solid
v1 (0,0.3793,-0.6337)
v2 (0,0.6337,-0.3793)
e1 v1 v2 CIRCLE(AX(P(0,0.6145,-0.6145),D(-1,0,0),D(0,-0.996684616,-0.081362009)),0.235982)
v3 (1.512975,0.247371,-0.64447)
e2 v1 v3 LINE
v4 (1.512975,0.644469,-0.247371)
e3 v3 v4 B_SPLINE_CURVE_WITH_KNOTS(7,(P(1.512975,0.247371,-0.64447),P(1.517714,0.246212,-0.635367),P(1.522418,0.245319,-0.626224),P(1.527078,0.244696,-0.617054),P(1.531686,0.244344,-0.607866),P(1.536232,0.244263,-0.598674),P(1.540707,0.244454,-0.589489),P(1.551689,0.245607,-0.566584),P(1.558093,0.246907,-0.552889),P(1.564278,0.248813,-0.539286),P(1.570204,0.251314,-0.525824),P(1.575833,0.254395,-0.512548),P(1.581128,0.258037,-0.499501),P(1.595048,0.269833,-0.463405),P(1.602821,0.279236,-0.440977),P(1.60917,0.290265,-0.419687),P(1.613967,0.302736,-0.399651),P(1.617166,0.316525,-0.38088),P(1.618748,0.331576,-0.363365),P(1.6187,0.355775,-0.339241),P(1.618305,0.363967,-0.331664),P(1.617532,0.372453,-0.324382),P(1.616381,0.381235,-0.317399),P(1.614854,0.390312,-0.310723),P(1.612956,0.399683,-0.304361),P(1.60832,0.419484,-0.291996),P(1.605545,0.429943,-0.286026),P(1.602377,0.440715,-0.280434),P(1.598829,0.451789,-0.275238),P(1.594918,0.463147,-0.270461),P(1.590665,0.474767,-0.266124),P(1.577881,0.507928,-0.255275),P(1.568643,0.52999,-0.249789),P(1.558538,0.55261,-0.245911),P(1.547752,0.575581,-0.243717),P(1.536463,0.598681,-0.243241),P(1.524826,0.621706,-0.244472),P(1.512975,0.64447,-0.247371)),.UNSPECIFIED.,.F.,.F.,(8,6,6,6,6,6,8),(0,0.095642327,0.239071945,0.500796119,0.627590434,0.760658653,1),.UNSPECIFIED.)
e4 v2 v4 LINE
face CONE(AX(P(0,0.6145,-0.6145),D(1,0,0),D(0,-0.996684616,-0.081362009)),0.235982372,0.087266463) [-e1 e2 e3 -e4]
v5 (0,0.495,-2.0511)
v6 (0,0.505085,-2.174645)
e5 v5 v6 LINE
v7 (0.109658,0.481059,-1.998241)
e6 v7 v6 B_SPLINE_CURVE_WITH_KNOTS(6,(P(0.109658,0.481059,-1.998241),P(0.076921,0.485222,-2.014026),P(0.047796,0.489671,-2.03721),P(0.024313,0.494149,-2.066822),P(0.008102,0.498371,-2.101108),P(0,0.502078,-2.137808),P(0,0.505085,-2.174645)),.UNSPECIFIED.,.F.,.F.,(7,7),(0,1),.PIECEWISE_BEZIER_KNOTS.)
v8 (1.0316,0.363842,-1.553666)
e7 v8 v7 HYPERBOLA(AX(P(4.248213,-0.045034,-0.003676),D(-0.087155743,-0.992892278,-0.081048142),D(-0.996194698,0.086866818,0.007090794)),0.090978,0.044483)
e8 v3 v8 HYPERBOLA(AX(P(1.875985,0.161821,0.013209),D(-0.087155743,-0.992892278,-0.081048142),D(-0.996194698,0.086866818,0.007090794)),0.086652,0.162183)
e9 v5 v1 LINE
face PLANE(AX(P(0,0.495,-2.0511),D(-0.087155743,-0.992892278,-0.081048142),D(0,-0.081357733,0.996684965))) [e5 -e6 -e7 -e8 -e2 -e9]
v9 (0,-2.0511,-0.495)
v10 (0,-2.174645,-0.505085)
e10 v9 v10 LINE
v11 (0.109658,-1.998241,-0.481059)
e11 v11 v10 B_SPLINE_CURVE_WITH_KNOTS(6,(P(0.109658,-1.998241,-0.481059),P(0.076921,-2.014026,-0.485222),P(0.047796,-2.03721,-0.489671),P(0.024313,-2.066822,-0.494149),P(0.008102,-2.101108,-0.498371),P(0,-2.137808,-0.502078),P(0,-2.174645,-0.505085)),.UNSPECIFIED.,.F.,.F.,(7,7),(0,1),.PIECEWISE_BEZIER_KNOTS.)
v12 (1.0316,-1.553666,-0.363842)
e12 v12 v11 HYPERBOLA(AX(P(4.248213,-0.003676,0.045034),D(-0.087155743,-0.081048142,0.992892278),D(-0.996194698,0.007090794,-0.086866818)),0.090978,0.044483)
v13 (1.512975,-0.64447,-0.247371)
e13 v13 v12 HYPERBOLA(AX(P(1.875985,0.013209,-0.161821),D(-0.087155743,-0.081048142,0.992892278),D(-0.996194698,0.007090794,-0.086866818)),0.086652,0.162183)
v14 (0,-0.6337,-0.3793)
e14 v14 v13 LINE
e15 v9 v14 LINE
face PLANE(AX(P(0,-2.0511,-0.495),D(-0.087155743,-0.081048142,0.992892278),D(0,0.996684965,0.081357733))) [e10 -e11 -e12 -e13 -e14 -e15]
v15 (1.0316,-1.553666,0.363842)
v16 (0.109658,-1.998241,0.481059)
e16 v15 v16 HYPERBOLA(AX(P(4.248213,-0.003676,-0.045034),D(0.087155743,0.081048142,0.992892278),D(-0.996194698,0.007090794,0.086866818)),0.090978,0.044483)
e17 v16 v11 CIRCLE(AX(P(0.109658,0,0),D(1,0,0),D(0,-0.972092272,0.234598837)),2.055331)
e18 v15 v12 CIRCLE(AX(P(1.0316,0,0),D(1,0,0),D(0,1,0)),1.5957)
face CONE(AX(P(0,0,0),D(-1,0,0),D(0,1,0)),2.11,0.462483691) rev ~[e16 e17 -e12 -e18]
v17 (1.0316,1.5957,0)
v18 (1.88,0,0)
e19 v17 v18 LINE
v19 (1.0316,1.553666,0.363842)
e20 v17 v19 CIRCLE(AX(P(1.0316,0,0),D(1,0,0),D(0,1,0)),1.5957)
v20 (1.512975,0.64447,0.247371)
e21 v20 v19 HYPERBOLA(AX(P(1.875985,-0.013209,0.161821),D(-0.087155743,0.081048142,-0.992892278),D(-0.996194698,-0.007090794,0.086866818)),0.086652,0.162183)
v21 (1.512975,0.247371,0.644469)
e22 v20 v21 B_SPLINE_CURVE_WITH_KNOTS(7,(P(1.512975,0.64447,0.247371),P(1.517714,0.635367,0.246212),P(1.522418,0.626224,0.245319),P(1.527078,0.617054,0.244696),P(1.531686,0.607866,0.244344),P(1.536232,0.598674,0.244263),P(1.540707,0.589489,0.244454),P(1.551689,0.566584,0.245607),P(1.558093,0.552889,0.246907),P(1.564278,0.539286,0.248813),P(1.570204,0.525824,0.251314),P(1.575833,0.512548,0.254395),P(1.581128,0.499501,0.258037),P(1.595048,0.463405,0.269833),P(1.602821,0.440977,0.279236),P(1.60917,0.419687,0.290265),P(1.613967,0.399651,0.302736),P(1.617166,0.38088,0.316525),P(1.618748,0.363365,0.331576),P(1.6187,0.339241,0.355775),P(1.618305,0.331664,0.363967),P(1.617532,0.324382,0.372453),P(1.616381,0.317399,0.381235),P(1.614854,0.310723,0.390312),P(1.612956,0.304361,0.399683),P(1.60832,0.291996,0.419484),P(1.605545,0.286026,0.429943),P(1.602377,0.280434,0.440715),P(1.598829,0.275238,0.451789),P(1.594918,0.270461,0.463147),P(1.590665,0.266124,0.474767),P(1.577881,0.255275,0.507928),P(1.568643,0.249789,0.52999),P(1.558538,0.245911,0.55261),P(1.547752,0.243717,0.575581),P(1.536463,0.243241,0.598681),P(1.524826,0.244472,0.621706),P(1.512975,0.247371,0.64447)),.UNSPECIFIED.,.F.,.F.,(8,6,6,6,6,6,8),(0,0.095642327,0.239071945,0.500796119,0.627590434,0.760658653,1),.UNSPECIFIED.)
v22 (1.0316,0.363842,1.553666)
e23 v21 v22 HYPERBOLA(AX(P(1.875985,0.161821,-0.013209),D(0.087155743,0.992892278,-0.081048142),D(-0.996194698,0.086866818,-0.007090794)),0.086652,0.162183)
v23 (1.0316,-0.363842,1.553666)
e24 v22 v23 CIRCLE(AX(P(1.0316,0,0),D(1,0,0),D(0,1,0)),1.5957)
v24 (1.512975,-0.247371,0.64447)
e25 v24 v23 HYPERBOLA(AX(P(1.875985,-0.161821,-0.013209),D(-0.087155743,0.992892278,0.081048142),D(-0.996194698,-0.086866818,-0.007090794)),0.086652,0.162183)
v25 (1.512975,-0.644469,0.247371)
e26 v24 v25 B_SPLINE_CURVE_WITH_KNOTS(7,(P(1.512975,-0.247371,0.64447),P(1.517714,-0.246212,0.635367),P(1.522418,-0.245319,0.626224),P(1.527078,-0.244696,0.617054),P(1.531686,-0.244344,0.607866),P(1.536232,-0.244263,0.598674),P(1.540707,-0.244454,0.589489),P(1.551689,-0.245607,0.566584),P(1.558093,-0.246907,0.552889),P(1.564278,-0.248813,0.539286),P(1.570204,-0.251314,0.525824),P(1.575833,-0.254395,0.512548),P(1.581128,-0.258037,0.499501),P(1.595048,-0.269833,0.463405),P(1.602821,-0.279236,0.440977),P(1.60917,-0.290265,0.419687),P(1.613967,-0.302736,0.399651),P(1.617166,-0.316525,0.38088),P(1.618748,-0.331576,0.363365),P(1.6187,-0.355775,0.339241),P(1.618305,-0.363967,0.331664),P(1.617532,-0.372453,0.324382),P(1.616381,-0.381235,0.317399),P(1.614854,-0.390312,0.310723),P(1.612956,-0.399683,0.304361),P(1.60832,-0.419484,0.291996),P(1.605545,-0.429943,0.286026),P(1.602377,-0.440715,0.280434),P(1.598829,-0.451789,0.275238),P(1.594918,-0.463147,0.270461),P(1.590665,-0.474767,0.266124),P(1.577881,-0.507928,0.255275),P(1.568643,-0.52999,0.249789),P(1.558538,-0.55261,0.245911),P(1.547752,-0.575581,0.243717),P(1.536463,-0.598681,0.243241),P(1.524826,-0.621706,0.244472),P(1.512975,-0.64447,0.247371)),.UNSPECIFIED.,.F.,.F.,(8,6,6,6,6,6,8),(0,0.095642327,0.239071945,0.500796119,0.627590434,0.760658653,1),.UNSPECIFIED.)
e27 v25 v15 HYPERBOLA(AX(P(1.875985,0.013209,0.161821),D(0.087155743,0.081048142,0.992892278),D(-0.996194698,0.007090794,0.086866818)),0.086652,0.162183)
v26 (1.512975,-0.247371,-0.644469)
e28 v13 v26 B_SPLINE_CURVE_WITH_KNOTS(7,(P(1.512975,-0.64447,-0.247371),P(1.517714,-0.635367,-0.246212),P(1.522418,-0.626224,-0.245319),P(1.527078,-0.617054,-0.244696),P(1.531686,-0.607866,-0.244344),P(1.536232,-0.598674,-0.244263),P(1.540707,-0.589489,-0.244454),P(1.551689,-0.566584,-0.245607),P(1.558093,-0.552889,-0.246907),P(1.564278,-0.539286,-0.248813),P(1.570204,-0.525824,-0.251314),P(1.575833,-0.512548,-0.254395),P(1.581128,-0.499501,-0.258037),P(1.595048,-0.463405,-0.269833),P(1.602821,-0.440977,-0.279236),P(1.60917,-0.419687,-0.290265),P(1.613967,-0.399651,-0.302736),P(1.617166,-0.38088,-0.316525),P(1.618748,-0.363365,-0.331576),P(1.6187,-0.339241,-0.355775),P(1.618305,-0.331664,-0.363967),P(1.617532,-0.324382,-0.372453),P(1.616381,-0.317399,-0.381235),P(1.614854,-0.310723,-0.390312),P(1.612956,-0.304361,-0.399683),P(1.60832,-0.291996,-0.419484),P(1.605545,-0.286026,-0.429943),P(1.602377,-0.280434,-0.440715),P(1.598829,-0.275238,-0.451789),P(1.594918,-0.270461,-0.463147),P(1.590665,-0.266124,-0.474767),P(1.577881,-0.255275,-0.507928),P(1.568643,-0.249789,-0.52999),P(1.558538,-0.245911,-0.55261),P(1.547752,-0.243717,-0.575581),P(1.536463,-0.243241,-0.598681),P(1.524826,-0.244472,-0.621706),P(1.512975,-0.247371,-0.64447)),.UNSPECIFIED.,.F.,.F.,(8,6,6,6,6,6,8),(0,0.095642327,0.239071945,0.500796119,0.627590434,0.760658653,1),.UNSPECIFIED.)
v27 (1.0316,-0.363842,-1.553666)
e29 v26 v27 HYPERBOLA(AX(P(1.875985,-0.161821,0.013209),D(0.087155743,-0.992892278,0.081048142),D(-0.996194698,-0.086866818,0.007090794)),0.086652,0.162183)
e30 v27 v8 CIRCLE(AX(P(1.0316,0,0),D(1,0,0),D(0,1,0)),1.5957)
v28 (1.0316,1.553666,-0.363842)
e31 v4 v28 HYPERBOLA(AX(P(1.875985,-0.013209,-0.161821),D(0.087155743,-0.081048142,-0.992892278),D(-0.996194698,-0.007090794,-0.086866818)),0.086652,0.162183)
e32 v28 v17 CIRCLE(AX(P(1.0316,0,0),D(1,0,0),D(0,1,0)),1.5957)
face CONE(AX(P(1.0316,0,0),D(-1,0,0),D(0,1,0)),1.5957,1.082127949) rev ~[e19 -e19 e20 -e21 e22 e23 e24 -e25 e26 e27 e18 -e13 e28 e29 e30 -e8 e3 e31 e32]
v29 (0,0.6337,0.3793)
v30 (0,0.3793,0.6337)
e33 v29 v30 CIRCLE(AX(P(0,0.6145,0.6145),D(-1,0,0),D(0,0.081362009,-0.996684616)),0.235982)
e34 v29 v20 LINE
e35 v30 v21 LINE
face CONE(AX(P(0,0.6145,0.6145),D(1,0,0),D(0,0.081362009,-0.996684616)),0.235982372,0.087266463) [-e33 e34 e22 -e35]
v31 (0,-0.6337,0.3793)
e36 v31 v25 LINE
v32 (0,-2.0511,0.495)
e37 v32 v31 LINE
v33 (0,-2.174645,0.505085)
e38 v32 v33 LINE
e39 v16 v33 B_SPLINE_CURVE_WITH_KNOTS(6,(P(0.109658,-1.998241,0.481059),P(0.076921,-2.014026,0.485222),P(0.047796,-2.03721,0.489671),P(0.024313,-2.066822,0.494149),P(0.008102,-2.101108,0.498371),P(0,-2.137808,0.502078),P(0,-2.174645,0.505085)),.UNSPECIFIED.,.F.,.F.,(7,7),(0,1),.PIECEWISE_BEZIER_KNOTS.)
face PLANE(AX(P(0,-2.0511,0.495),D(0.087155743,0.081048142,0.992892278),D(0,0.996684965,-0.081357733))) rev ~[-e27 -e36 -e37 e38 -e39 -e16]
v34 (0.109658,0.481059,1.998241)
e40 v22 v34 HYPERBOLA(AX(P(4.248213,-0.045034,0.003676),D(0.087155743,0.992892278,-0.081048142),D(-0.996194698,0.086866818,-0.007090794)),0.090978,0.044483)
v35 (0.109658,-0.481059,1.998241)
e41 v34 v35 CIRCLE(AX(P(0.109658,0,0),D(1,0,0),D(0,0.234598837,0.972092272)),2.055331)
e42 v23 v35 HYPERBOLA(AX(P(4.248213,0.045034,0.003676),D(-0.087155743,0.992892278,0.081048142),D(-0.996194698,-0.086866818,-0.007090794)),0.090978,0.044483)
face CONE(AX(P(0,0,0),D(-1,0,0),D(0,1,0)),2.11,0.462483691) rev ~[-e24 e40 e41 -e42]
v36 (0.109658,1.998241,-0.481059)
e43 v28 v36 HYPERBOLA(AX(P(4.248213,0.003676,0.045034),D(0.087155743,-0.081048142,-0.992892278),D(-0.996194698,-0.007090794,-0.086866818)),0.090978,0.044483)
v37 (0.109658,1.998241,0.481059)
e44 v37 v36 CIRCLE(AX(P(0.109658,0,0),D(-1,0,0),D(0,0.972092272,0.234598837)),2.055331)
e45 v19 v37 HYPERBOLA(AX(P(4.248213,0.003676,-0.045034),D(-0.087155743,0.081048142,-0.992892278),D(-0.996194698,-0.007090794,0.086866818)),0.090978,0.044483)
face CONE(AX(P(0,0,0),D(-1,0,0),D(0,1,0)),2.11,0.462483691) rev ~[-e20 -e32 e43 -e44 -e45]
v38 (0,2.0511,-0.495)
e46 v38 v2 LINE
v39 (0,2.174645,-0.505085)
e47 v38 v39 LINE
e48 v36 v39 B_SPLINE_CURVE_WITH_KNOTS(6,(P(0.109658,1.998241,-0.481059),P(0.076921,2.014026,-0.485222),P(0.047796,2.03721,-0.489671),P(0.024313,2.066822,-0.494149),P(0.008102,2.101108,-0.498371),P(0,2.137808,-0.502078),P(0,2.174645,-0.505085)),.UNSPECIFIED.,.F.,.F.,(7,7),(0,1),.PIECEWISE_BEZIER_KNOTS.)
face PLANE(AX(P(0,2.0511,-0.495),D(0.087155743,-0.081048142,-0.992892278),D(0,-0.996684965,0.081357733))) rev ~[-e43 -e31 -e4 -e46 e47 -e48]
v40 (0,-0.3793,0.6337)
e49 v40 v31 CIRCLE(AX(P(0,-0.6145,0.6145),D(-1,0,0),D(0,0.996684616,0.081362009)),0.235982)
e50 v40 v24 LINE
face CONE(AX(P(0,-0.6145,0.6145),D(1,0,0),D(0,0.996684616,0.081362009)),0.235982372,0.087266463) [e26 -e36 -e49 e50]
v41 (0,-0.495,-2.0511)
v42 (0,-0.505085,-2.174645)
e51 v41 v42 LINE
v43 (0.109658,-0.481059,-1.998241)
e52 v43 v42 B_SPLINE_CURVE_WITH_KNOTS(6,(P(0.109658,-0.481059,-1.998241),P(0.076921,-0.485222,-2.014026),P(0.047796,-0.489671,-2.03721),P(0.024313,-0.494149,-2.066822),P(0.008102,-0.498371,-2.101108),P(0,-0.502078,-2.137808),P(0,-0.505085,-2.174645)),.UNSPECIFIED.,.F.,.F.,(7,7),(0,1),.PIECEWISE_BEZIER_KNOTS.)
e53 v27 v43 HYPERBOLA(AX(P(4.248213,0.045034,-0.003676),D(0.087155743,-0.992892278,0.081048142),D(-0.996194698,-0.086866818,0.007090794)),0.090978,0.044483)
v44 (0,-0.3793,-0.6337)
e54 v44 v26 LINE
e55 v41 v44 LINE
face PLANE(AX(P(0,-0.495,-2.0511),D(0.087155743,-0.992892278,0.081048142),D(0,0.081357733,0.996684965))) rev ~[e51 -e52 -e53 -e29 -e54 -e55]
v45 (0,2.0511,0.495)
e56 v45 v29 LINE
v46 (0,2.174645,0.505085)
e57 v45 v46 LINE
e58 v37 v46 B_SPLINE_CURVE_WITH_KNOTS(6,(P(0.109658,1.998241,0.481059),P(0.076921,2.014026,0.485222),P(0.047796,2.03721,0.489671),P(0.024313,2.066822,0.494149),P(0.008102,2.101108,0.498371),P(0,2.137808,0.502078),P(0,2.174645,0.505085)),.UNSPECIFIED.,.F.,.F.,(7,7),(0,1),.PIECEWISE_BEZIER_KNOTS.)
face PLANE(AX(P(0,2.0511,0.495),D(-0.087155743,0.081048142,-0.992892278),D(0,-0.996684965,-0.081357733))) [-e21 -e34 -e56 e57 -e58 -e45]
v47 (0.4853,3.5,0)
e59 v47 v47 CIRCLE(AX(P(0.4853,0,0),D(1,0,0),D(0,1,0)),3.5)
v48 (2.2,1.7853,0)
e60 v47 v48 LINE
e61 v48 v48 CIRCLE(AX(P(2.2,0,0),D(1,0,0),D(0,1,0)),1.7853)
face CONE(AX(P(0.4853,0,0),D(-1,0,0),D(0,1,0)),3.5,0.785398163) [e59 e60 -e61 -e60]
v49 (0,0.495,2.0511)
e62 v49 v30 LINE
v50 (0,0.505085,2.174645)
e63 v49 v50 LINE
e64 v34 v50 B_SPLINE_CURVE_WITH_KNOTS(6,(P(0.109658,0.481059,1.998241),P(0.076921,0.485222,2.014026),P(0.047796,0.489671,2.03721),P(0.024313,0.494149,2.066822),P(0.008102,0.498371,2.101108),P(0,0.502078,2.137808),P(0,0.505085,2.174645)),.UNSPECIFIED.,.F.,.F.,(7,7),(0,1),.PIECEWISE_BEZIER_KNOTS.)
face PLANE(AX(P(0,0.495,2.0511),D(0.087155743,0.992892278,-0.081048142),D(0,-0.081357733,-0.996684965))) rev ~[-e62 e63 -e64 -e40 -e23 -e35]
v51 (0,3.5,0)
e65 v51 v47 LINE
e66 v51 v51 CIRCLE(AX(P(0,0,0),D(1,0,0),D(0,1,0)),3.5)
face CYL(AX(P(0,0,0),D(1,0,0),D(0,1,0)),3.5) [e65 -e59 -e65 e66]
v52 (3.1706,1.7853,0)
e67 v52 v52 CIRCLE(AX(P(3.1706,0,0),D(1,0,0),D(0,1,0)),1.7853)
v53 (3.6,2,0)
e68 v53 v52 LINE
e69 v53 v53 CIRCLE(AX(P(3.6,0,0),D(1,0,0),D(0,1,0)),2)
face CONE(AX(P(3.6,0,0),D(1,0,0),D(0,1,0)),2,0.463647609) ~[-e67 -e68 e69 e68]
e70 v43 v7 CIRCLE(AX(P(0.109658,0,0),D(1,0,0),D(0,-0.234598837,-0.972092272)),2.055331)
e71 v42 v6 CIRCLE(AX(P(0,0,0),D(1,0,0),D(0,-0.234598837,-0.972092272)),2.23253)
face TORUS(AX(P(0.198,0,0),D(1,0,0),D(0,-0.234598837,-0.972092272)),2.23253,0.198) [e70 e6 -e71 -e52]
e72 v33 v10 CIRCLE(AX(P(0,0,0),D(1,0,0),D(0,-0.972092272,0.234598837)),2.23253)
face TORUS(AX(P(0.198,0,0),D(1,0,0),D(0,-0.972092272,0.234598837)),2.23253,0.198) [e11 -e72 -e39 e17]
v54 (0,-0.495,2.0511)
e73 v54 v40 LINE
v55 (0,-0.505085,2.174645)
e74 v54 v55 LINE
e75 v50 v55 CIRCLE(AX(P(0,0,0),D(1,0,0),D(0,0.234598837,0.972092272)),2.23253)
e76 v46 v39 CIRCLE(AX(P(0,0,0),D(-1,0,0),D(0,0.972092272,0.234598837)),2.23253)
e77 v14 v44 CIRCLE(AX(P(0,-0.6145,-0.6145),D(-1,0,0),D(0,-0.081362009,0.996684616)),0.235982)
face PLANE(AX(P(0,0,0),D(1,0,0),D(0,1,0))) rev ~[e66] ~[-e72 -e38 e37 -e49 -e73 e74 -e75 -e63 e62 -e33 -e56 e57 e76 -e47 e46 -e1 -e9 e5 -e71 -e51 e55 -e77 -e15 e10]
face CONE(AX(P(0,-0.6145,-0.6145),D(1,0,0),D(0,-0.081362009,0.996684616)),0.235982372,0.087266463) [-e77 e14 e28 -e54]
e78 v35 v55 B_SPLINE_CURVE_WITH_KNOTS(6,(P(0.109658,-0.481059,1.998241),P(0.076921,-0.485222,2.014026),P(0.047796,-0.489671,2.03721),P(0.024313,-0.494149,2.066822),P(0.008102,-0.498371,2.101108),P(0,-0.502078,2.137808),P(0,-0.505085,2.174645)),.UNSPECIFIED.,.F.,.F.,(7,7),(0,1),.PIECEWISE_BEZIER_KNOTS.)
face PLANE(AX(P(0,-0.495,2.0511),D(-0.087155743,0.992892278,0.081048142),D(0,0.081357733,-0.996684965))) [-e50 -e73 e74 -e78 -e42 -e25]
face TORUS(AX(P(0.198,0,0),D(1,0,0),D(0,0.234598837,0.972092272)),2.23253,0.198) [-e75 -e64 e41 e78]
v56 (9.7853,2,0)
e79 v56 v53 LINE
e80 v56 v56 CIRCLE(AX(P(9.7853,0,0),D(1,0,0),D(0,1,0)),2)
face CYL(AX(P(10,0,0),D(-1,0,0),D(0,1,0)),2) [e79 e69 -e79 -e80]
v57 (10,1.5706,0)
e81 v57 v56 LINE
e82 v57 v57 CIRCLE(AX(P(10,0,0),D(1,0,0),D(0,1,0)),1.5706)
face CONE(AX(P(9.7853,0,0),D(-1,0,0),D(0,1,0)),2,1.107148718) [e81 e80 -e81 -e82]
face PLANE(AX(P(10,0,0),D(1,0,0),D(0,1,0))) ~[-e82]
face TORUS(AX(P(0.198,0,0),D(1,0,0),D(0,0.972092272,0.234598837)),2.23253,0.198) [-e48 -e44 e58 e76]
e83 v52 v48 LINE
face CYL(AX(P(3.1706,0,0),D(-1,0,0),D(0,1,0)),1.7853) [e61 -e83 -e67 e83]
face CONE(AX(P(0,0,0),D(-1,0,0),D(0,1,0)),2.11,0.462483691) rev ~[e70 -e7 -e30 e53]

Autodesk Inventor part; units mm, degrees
ref_plane "YZ Plane" through (0, 0, 0) normal (1, 0, 0) x (0, 1, 0)
ref_plane "XZ Plane" through (0, 0, 0) normal (0, 1, 0) x (-1, 0, 0)
sketch "Sketch1" plane through (0, 0, 0) normal (0, 0, 1) x (1, 0, 0)
  line L0 (1.88, 0) -> (10, 0)
  line L1 (10, 0) -> (10, 2)
  line L2 (10, 2) -> (3.6, 2)
  line L3 (3.6, 2) -> (3.1706, 1.7853)
  line L4 (3.1706, 1.7853) -> (2.2, 1.7853)
  line L5 (0, 3.5) -> (0, 2.11)
  line L6 (0, 2.11) -> (1.0316, 1.5957)
  line L7 (1.0316, 1.5957) -> (1.88, 0)
  line L8 (-2, 0) -> (12, 0) projected
  line L9 (0, -0.7) -> (0, 4.2) projected
  line L10 (0, 3.5) -> (0.4853, 3.5)
  line L11 (0.4853, 3.5) -> (2.2, 1.7853)
  line L12 (3.6, 2) -> (1.9853, 2) construction
  dimension "d1" = 6.4
  dimension "d2" = 4
  dimension "d3" = 3.5706
  dimension "d4" = 4.22
  dimension "d5" = 26.5
  dimension "d6" = 62
  dimension "d7" = 1.88
  dimension "d8" = 0.4294
  dimension "d12" = 7
  dimension "d13" = 45
  dimension "d15" = 10
  dimension "d24" = 2.2
revolve "Body" add sketch "Sketch1" angle 360 about axis through (1.88, 0, 0) along (1, 0, 0) contours L7 L6 L5 L10 L11 L4 L3 L2 L1 L0
sketch "Sketch2" plane through (0, 0, 0) normal (-1, 0, 0) x (0, 0, 1)
  line L0 (0, 2.11) -> (0, 0) construction
  line L1 (0, 0) -> (2.11, 0) construction
  arc A0 (0.633, 0) -> (0, 0.633) centre (0, 0) ccw construction
  arc A1 (0.7385, 0) -> (0, 0.7385) centre (0, 0) ccw construction
  arc A2 (2.0511, 0.495) -> (0.495, 2.0511) centre (0, 0) ccw
  line L2 (0, 0) -> (1.492, 1.492) construction
  line L3 (0.495, 2.0511) -> (0.3793, 0.6337)
  line L4 (2.0511, 0.495) -> (0.6337, 0.3793)
  arc A3 (0.495, 2.0511) -> (0, 2.11) centre (0, 0) ccw
  arc A4 (2.11, 0) -> (2.0511, 0.495) centre (0, 0) ccw
  line L5 (0, -4.9) -> (0, 4.9) projected
  line L6 (-4.9, 0) -> (4.9, 0) projected
  arc A5 (0.495, -2.0511) -> (2.0511, -0.495) centre (0, 0) ccw
  line L7 (0.495, -2.0511) -> (0.3793, -0.6337)
  line L8 (2.0511, -0.495) -> (0.6337, -0.3793)
  arc A6 (0, -2.11) -> (0.495, -2.0511) centre (0, 0) ccw
  arc A7 (2.0511, -0.495) -> (2.11, 0) centre (0, 0) ccw
  arc A8 (-0.495, 2.0511) -> (-2.0511, 0.495) centre (0, 0) ccw
  line L9 (-0.495, 2.0511) -> (-0.3793, 0.6337)
  line L10 (-2.0511, 0.495) -> (-0.6337, 0.3793)
  arc A9 (0, 2.11) -> (-0.495, 2.0511) centre (0, 0) ccw
  arc A10 (-2.0511, 0.495) -> (-2.11, 0) centre (0, 0) ccw
  arc A11 (-0.495, -2.0511) -> (0, -2.11) centre (0, 0) ccw
  arc A12 (-2.0511, -0.495) -> (-0.495, -2.0511) centre (0, 0) ccw
  arc A13 (-2.11, 0) -> (-2.0511, -0.495) centre (0, 0) ccw
  line L11 (-2.0511, -0.495) -> (-0.6337, -0.3793)
  line L12 (-0.495, -2.0511) -> (-0.3793, -0.6337)
  arc A14 (0.3793, 0.6337) -> (0.6337, 0.3793) centre (0.6145, 0.6145) ccw
  arc A15 (0.6337, -0.3793) -> (0.3793, -0.6337) centre (0.6145, -0.6145) ccw
  arc A16 (-0.6337, 0.3793) -> (-0.3793, 0.6337) centre (-0.6145, 0.6145) ccw
  arc A17 (-0.3793, -0.6337) -> (-0.6337, -0.3793) centre (-0.6145, -0.6145) ccw
  point P0 (1.492, -1.492)
  point P1 (-1.492, 1.492)
  point P2 (-1.492, -1.492)
  dimension "d17" = 1.266
  dimension "d18" = 1.477
  dimension "d19" = 4.22
  dimension "d20" = 45
  dimension "d21" = 0.495
extrude "Slot" add sketch "Sketch2" against normal up to next draft 5 contours L4 A14 L3 A2 | A5 L7 A15 L8 | L9 A16 L10 A8 | A12 L11 A17 L12
fillet "Fillet1" radius 0.198 4 edges at (0, 2.11, 0) (0, 0, -2.11) (0, -2.11, 0) (0, 0, 2.11)
thread "Thread" size "M4x0.7" class "6g" standard "ISO Metric profile" length 6.4
chamfer "Chamfer1" distance 0.4294 distance2 0.2147 1 edges at (10, -2, 0) measured on face at (10, -0.499, 0.4421)
ref_plane "Work Plane2" through (3.35, 0, 0) normal (0, 0, -1) x (1, 0, 0)
equation "\"d17\" = 0.3 * SDM"
equation "\"d18\" = 0.35 * SDM"
equation "\"d19\" = SDM"
equation "\"d21\" = 0.5 * SBR"
equation "\"d1\" = GEL"
equation "\"d2\" = GD"
equation "\"d3\" = BDM"
equation "\"d4\" = SDM"
equation "\"d7\" = INTI"
equation "\"d8\" = GAL"
equation "\"d12\" = KOD"
equation "\"d13\" = 0.5 * SEWI"
equation "\"d15\" = NLG"
equation "\"d24\" = KOH"
equation "\"d23\" = 0.2 * SBR"
equation "\"d10\" = GEL"
equation "\"d25\" = -0.5 * SPD + 0.5 * GD"
equation "\"d26\" = 0.5 * GAL"
equation "\"NLG\" = 10"
equation "\"GEL\" = 6.4"
equation "\"GAL\" = 0.61345 * PTC"
equation "\"SPD\" = NND - 1.2269 * PTC"
equation "\"KOD\" = 7"
equation "\"KOH\" = 2.2"
equation "\"SBR\" = 0.99"
equation "\"INTI\" = 1.88"
equation "\"SDM\" = 4.22"
equation "\"GD\" = NND"
equation "\"BDM\" = NND - GAL"
equation "\"SEWI\" = 90deg"
equation "\"d9\" = SDM"
equation "\"GUL\" = 0.61345 * PTC"
equation "\"TOA\" = 30deg"
equation "\"EPV\" = 4.2"
equation "\"THREADDIA\" = 4"
equation "\"RR\" = 0.4"
equation "\"PTC\" = 0.7"
equation "\"NND\" = 4"
equation "\"GD1\" = THREADDIA - 1.2269 * PTC"
properties part number "AS 1427 - M4 x 10" material "Steel, Mild"
